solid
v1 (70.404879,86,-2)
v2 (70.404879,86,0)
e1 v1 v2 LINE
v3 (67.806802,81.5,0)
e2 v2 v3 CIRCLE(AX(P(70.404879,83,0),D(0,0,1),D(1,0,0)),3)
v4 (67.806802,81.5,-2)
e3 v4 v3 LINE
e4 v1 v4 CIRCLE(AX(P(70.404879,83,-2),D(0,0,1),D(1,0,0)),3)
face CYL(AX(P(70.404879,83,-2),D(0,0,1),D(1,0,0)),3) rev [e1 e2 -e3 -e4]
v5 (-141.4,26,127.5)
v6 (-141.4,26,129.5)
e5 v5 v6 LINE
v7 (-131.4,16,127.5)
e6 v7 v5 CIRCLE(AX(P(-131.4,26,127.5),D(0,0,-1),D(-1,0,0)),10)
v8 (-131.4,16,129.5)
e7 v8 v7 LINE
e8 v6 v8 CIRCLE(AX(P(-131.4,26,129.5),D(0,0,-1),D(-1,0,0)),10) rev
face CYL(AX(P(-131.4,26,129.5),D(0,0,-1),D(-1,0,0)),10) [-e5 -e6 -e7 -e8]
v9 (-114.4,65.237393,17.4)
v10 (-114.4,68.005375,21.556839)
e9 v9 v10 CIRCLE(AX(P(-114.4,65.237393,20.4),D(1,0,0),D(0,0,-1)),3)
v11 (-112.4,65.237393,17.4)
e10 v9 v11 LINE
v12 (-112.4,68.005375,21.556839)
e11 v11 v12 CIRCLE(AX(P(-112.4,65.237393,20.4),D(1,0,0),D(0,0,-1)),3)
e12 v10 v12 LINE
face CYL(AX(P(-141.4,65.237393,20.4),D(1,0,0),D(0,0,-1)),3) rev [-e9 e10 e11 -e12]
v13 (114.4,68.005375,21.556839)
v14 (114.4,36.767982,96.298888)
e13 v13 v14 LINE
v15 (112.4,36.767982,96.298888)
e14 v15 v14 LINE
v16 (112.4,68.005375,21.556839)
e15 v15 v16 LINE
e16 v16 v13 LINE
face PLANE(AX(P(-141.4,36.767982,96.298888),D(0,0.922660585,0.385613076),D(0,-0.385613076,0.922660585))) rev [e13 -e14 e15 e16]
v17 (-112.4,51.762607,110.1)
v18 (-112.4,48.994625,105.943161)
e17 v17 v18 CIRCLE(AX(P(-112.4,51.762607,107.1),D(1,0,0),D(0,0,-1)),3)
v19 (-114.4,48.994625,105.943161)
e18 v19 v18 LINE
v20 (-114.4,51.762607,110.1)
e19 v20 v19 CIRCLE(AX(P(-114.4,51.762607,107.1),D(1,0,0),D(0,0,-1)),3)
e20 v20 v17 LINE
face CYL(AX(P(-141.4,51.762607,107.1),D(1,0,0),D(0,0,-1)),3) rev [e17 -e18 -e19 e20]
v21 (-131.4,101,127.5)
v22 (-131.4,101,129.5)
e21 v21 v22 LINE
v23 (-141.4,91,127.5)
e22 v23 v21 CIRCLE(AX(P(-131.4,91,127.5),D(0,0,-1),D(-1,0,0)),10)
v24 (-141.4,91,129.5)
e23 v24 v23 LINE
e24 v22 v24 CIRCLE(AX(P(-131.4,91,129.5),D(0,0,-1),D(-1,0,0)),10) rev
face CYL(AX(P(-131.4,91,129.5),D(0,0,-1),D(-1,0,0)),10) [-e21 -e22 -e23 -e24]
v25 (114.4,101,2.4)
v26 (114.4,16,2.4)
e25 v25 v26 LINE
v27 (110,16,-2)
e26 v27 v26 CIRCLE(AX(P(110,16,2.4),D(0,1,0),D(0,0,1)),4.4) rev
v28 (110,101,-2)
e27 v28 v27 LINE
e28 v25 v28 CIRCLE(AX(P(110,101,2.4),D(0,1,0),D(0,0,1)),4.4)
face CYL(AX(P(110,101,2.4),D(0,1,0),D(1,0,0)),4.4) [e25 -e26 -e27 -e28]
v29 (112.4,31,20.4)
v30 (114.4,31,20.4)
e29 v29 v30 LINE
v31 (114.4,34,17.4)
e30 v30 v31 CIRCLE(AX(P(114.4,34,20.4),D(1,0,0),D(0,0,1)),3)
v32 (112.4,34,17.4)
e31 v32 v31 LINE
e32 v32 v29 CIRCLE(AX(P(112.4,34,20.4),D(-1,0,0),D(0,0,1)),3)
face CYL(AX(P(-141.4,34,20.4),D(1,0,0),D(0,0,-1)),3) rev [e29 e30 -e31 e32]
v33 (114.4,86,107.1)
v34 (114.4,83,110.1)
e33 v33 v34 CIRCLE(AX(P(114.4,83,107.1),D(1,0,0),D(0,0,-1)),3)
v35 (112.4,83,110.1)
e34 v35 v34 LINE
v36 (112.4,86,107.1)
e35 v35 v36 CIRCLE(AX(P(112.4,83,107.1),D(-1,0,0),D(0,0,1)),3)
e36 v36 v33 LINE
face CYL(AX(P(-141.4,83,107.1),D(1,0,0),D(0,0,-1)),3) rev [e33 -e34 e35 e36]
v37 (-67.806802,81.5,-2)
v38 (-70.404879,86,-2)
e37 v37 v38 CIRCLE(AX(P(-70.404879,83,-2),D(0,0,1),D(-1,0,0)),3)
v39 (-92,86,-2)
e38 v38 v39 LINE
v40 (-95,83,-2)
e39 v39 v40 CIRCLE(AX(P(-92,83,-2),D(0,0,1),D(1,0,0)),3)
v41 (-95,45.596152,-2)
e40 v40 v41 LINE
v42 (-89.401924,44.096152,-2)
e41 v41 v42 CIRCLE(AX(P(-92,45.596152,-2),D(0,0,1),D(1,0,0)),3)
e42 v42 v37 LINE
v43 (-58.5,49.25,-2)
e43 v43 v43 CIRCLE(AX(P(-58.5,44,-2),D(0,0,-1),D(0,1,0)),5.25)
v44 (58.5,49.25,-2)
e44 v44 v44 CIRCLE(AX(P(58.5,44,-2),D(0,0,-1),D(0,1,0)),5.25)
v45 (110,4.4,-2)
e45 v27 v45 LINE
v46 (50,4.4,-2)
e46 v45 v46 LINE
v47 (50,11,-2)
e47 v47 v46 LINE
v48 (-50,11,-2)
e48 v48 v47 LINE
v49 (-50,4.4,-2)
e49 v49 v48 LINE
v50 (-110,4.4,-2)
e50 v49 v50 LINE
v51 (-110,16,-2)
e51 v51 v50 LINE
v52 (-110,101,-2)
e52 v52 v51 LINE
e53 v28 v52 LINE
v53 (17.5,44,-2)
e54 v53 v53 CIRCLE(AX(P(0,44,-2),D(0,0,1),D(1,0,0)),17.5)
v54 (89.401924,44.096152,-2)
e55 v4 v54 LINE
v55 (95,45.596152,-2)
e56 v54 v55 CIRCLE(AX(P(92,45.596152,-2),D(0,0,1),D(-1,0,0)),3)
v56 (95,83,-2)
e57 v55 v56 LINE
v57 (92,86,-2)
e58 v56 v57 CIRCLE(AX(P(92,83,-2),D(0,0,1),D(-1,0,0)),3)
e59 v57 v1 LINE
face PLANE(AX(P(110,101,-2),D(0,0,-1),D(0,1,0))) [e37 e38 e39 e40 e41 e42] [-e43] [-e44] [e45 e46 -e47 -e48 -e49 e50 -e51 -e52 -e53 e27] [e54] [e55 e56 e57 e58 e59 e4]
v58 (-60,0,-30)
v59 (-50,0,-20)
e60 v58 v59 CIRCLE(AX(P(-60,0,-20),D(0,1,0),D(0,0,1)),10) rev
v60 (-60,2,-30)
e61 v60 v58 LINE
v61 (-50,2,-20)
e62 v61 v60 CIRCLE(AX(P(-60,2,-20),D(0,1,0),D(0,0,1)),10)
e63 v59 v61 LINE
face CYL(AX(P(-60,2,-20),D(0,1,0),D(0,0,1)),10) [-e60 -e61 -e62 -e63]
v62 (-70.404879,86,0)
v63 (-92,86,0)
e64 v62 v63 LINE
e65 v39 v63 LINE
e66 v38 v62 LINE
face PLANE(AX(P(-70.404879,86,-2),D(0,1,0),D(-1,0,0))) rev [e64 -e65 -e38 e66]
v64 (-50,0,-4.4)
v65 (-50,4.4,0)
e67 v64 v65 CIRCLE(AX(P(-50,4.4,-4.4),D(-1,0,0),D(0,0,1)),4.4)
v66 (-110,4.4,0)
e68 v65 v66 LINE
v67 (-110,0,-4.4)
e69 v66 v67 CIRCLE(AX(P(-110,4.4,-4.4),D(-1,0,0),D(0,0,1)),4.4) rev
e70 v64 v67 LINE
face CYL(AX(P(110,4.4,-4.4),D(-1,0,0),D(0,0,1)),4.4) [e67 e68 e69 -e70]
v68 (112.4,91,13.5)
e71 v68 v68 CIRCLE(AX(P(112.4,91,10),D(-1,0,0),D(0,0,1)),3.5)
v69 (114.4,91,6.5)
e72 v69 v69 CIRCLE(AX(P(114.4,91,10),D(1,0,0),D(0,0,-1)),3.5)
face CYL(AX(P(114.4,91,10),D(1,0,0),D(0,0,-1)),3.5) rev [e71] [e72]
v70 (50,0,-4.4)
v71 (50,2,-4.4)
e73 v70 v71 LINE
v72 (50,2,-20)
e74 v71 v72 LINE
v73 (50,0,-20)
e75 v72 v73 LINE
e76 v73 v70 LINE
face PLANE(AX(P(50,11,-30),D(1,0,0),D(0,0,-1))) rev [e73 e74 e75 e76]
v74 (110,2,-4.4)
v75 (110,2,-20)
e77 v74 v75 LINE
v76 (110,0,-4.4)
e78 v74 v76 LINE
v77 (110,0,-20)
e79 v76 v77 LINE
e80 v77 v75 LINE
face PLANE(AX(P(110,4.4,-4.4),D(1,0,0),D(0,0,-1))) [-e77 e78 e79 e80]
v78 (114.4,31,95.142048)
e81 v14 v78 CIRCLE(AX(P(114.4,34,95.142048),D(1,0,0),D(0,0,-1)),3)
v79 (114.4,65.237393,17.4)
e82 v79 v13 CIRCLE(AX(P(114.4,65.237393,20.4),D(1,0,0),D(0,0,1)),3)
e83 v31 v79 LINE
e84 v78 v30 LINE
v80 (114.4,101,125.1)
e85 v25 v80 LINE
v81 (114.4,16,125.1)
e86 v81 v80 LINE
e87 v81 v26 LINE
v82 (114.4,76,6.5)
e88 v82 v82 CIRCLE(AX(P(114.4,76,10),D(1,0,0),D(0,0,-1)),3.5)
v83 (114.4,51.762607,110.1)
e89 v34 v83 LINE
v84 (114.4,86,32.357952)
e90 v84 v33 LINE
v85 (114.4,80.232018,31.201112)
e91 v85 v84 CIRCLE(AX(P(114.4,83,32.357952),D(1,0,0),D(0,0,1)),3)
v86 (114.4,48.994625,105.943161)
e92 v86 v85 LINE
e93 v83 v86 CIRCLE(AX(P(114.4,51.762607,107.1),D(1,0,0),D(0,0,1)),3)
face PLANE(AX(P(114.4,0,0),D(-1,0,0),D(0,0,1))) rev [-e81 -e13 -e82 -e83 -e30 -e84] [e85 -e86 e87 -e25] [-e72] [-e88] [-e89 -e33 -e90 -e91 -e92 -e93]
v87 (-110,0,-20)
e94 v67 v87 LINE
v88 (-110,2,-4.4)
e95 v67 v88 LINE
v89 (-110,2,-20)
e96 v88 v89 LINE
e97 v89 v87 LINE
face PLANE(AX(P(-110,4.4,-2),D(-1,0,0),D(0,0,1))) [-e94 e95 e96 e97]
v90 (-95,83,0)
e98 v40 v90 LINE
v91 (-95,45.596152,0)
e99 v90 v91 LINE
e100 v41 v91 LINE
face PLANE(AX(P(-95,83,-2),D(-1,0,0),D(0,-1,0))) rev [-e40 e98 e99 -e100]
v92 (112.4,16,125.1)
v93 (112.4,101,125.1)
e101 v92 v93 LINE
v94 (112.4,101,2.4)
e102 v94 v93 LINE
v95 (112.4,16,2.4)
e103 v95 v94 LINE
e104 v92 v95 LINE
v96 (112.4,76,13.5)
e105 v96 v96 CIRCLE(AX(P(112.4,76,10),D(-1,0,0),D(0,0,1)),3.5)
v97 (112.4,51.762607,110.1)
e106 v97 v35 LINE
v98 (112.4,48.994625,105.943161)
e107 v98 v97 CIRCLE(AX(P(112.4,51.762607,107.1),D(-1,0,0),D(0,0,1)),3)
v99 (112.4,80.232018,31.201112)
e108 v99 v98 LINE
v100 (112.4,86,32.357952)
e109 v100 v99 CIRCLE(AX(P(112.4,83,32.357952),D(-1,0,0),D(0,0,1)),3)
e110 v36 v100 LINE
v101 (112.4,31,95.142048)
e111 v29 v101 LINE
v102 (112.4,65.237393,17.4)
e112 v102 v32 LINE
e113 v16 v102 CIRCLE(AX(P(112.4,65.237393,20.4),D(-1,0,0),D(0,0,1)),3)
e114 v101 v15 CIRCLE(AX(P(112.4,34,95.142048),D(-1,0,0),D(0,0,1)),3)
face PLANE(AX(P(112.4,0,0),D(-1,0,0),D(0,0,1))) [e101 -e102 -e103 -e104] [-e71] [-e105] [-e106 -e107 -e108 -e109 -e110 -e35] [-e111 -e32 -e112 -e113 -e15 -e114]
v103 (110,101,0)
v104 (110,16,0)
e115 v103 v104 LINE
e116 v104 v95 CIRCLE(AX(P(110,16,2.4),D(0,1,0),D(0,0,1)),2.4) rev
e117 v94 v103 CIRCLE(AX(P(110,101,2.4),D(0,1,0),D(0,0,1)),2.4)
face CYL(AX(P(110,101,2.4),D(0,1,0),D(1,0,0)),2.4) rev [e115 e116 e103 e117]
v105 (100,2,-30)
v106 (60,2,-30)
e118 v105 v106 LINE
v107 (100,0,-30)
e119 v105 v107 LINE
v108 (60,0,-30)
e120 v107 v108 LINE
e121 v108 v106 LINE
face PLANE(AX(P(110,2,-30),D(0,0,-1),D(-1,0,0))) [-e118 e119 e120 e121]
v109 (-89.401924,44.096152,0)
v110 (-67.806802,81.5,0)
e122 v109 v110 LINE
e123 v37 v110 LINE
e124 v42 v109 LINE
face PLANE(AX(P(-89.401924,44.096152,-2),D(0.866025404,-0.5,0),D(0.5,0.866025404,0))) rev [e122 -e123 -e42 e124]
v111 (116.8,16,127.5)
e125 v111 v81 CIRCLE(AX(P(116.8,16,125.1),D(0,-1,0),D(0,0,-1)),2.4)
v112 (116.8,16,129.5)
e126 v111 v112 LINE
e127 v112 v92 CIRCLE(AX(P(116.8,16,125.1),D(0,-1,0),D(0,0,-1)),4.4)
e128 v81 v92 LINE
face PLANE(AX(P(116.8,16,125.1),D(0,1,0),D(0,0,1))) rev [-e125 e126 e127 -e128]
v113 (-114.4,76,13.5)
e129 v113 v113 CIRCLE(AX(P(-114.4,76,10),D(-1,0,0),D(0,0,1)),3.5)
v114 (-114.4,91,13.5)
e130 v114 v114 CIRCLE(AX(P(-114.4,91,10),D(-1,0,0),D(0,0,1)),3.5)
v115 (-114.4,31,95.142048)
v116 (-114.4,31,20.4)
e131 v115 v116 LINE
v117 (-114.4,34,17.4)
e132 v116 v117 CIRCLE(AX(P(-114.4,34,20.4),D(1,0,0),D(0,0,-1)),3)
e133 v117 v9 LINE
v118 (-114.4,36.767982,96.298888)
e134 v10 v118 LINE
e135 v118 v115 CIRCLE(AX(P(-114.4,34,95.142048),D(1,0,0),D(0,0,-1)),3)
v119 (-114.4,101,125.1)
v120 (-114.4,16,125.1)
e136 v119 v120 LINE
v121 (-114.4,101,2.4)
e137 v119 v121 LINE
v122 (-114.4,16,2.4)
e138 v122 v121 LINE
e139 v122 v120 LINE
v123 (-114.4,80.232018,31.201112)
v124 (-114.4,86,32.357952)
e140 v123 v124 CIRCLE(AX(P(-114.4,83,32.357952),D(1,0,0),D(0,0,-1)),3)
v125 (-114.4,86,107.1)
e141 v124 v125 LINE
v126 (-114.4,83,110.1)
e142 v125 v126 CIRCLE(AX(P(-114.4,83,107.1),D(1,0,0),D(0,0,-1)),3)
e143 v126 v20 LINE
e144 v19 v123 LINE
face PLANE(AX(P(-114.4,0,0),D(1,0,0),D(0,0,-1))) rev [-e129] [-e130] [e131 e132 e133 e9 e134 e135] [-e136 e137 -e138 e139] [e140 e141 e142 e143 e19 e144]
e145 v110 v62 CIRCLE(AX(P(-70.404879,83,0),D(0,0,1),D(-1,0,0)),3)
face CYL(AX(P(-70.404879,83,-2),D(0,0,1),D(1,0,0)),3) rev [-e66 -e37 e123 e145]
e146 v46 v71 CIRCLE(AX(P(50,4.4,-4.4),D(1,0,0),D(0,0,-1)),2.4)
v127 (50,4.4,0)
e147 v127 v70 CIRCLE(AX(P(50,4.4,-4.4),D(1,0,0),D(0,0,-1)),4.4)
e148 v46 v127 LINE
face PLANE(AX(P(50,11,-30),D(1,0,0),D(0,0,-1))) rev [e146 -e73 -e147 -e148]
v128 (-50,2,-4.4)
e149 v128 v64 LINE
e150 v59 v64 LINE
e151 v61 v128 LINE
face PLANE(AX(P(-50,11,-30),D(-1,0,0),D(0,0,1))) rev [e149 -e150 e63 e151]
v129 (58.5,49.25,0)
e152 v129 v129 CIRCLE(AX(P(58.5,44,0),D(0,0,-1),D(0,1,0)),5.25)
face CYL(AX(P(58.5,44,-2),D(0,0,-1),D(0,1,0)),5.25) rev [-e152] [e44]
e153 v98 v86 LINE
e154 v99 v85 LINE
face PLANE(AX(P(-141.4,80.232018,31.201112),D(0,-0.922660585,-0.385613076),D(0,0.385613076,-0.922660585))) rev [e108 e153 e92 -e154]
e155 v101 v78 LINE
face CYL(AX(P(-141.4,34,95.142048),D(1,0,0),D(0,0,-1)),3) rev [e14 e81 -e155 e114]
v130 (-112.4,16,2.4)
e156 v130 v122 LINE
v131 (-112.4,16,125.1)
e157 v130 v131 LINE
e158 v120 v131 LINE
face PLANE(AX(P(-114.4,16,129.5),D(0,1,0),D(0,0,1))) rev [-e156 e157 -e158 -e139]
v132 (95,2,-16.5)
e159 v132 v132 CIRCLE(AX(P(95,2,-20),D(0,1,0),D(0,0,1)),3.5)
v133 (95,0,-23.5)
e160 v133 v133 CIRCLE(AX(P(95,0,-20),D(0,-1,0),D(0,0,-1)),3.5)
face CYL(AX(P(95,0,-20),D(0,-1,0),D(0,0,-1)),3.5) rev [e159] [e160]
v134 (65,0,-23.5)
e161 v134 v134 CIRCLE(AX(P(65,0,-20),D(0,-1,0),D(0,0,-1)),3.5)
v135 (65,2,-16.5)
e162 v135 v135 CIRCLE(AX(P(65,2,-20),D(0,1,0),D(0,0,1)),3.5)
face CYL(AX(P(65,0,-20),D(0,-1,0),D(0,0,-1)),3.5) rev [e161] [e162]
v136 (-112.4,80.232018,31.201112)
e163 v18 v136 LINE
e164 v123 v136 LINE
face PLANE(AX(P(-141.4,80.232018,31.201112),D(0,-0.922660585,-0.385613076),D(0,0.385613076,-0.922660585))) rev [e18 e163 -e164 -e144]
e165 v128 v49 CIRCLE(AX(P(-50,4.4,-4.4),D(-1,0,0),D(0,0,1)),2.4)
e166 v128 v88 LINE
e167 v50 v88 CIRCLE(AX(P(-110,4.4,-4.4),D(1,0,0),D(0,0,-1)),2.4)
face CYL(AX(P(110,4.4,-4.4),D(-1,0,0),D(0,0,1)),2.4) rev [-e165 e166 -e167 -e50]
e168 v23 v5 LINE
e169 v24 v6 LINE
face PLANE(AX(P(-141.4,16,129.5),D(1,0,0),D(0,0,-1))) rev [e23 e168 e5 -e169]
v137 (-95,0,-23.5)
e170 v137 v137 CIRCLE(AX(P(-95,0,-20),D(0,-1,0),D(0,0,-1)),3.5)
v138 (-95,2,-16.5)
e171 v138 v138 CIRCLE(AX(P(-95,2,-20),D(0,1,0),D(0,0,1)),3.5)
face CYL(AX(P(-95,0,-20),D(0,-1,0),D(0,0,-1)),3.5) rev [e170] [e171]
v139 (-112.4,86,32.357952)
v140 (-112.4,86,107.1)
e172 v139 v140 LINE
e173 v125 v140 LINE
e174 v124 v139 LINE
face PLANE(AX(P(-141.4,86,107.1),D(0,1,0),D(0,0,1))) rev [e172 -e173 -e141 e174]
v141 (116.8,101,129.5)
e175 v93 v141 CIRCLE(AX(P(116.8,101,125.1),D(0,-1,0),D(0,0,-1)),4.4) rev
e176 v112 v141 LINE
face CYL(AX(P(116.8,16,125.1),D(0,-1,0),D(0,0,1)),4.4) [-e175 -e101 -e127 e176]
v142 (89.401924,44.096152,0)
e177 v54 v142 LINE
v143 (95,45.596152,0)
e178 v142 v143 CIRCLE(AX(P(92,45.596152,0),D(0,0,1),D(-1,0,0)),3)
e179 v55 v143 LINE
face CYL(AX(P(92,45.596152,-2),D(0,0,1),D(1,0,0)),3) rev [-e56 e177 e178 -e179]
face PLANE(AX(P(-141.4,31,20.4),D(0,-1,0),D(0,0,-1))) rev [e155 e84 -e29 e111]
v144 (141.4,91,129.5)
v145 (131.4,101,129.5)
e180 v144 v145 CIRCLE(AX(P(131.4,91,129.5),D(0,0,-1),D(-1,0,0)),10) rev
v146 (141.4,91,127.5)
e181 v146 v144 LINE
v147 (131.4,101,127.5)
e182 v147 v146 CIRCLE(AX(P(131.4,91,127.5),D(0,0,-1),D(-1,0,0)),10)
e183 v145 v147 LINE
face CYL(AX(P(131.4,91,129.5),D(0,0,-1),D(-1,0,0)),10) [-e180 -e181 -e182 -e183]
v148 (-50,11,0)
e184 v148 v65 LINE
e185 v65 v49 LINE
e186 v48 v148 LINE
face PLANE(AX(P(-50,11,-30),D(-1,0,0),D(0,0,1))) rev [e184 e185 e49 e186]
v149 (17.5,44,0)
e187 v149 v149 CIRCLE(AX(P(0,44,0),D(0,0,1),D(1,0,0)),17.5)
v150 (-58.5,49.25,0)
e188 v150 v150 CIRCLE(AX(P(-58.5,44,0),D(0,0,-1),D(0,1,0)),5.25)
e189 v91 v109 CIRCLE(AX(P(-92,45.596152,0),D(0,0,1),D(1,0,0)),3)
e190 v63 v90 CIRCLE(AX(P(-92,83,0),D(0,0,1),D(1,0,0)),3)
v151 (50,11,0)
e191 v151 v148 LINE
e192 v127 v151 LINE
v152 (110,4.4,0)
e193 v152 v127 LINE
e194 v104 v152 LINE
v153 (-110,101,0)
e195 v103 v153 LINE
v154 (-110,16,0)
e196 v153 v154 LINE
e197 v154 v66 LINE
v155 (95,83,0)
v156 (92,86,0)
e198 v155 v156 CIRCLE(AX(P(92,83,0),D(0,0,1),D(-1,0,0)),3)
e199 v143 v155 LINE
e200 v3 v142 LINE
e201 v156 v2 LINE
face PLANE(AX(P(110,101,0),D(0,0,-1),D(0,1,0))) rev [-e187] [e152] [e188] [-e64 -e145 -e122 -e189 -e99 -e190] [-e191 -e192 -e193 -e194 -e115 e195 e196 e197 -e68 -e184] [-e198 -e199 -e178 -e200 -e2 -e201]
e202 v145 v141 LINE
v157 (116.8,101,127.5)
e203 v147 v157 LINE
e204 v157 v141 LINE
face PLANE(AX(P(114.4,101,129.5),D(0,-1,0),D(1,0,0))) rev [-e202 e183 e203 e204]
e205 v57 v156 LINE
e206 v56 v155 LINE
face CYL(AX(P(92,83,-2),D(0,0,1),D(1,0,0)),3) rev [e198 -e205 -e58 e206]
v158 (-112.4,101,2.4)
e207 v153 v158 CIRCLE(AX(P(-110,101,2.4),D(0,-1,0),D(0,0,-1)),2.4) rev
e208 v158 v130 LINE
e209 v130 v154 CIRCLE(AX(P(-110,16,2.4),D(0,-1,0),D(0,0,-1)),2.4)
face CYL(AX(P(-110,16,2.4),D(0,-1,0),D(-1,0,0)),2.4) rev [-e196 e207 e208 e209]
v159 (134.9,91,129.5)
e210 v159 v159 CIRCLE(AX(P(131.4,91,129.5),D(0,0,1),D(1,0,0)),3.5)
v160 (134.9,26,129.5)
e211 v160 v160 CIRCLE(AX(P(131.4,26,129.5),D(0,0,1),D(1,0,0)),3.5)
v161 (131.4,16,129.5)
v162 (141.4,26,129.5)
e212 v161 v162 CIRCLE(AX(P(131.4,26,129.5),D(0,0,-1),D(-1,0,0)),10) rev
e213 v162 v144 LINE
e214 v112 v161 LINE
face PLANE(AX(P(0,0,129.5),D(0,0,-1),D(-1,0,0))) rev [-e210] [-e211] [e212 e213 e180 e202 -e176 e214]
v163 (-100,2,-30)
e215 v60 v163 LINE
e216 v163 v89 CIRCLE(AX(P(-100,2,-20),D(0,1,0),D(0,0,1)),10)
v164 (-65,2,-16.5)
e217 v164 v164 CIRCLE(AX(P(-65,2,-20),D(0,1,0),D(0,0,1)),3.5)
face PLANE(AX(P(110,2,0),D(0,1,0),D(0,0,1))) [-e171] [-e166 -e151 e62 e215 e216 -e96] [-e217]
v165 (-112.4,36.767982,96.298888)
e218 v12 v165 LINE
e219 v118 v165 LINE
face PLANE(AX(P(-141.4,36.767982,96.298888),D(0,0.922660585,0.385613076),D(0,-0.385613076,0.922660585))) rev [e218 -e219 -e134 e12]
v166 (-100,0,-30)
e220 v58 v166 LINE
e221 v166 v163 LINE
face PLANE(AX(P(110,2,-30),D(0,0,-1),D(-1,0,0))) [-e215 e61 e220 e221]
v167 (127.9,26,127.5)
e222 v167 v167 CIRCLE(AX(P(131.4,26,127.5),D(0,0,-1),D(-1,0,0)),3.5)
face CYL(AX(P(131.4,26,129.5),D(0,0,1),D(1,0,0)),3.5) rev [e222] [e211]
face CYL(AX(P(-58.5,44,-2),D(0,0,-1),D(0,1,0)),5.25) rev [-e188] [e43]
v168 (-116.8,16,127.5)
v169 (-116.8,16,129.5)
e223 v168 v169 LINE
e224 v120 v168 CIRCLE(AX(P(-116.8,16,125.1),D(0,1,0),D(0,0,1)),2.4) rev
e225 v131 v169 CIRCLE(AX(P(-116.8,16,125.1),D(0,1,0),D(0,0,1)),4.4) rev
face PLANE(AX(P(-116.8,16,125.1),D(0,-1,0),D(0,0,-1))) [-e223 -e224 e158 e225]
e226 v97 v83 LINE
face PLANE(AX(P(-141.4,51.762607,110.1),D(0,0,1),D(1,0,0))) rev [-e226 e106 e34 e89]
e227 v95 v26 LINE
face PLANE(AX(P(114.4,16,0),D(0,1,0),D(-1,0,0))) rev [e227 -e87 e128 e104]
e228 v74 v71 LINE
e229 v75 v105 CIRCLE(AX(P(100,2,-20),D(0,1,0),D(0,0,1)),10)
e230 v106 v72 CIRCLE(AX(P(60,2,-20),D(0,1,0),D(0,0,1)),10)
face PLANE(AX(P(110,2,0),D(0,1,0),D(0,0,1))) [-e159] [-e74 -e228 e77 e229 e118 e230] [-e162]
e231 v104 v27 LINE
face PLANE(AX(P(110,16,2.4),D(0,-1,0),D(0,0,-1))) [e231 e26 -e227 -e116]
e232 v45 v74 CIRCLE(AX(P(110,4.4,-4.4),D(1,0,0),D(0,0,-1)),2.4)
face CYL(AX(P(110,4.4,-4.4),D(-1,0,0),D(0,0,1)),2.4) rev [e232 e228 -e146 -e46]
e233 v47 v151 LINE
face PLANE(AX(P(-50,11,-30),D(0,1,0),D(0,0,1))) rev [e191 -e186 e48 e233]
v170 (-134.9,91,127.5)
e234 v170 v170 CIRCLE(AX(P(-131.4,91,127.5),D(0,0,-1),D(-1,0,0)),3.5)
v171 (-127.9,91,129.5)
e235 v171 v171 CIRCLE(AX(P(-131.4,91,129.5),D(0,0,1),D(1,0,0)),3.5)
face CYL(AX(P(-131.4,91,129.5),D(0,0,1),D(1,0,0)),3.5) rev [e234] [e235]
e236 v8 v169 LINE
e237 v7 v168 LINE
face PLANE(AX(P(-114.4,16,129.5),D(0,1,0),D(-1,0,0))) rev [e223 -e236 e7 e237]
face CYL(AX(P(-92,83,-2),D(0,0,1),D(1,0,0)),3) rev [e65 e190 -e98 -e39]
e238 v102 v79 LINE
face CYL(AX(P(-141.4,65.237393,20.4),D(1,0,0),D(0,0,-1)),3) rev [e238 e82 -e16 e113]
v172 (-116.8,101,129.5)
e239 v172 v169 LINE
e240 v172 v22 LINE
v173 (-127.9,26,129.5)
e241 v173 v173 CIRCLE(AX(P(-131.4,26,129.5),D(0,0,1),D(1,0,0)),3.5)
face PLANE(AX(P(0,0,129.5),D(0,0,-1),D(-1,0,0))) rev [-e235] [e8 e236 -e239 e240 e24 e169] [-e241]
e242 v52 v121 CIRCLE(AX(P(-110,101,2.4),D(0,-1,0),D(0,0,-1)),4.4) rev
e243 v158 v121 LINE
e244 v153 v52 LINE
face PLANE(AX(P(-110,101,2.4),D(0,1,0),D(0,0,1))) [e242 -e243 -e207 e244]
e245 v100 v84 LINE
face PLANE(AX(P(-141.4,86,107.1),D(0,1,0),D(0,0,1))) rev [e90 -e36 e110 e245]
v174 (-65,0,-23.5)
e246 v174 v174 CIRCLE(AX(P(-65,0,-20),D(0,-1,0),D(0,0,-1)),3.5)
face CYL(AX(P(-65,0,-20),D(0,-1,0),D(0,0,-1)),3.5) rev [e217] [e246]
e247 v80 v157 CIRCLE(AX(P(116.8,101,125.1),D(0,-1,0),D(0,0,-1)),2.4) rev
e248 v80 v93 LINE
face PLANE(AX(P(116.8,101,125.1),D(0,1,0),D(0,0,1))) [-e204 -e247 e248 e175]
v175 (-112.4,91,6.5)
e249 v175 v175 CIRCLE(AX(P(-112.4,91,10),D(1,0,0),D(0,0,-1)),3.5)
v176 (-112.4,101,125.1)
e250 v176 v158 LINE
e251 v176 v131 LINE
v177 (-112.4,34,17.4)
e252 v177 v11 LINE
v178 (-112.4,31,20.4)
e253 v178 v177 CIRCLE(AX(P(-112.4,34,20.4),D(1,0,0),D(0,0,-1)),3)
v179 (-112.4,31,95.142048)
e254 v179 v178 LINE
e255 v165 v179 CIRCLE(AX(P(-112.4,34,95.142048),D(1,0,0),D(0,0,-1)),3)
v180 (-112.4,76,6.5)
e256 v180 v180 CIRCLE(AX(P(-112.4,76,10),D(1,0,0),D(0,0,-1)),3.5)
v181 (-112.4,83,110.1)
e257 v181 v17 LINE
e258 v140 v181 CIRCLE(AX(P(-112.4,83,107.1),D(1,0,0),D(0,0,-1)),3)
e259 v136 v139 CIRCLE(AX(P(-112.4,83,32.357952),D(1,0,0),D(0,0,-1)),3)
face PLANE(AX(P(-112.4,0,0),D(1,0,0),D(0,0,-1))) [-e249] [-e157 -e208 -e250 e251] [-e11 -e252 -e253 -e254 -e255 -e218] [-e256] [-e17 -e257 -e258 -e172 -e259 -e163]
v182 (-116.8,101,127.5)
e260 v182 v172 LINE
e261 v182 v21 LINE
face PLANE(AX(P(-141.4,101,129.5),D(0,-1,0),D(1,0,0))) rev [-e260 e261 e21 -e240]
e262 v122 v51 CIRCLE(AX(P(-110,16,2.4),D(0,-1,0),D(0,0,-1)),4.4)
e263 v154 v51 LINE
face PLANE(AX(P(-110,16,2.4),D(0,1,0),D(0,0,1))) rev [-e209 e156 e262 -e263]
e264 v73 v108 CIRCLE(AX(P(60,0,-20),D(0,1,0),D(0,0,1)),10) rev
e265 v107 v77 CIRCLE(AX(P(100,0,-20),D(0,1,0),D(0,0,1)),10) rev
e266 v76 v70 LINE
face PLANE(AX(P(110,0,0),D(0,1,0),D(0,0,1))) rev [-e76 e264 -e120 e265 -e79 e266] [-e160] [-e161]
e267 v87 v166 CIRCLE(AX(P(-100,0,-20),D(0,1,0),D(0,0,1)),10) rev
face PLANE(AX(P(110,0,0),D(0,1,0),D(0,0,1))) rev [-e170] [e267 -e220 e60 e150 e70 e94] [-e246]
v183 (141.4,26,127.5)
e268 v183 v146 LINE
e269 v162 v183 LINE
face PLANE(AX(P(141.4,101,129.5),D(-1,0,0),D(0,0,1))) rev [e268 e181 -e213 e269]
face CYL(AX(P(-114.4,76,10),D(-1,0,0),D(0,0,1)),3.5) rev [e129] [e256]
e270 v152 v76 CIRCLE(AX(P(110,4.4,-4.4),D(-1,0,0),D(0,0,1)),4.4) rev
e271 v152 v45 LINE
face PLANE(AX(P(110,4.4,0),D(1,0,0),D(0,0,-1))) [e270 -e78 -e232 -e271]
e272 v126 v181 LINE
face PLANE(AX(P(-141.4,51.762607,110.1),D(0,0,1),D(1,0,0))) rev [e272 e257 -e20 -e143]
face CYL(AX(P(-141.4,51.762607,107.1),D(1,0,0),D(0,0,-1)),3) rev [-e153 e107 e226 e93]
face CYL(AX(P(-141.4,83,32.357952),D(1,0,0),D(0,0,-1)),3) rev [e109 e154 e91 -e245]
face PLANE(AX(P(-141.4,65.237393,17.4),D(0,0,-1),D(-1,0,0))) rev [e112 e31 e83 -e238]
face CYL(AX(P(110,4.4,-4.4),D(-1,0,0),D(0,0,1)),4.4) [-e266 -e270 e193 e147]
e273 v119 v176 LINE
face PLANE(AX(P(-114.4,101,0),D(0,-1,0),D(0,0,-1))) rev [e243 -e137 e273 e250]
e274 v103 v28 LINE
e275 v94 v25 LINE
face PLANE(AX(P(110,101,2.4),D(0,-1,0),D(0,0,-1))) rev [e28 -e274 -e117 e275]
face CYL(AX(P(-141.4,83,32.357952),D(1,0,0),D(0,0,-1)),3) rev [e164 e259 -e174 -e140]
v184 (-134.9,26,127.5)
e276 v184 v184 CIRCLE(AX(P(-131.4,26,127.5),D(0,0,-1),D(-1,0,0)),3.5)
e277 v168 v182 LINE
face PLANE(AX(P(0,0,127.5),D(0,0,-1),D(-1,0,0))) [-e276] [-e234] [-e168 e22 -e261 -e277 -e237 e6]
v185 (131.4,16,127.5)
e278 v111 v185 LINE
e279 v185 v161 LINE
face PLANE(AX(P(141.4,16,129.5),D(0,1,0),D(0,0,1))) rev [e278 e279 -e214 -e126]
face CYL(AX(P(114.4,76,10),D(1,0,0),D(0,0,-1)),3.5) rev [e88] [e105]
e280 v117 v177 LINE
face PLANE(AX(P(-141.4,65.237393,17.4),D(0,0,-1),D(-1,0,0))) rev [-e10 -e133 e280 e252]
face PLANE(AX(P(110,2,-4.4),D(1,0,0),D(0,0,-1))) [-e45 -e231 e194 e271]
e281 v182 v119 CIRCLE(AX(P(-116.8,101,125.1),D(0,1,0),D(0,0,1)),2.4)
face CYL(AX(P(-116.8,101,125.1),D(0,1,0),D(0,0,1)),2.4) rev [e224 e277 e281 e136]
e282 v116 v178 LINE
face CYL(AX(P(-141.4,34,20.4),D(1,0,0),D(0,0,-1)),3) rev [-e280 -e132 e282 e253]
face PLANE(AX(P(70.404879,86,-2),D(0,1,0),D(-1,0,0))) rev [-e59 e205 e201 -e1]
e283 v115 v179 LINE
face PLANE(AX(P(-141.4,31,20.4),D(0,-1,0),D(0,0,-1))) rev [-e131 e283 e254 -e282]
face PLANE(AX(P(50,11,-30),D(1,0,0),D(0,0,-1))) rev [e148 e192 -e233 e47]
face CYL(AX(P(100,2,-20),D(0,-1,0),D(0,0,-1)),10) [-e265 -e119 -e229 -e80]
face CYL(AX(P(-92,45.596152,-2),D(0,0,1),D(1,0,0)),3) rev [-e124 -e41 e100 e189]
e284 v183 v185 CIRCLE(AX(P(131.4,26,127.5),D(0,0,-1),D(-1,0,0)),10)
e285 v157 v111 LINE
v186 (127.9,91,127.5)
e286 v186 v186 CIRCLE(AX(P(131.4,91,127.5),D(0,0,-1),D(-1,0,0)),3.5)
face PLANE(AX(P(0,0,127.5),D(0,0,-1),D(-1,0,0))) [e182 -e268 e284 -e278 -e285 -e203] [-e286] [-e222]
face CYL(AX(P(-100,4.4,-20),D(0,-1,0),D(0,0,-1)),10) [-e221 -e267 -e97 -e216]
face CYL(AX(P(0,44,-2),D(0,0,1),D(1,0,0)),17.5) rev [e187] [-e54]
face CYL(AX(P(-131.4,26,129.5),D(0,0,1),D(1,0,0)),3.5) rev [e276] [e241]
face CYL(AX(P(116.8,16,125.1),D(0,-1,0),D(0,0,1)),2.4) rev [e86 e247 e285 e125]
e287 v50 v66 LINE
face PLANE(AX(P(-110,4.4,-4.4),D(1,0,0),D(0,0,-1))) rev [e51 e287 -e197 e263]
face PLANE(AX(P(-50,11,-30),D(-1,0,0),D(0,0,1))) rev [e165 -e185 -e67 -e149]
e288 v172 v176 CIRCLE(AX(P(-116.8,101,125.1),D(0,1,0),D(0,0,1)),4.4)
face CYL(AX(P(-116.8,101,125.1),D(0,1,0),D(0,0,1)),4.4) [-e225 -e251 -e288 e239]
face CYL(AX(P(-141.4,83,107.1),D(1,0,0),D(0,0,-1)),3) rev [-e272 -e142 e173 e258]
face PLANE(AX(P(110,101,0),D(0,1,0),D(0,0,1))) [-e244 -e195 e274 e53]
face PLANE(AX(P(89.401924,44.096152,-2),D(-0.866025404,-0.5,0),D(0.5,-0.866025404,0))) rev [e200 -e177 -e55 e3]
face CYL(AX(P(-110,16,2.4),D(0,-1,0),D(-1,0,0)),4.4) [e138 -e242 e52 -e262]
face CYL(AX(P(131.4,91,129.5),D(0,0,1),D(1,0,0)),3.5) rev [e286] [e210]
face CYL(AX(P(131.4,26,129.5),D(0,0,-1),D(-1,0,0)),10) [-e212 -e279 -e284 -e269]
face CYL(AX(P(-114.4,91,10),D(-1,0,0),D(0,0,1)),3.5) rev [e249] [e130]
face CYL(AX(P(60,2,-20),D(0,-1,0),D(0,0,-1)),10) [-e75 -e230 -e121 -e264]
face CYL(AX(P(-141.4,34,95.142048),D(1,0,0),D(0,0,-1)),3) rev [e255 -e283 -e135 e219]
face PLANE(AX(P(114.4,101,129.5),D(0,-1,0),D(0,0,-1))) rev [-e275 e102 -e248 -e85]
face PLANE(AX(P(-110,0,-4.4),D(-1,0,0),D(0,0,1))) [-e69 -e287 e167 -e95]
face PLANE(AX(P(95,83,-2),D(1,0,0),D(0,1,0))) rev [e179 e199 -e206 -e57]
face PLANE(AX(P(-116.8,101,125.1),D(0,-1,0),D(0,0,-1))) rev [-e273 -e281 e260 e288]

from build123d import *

# Parameters (mm, degrees)
SM_START                           = -110
SM_BASE_FLANGE_1_DEPTH             = 220
SKETCH_6_R                         = 17.5
CUT_EXTRUDE_1_DEPTH                = 10
HOLE_WIZARD_7_0_7_1_D              = 7
SKETCH_21_W                        = 100
SKETCH_21_H                        = 11
CUT_EXTRUDE_4_DEPTH                = 153.318744743
FILLET_1_R                         = 10
SM_EDGE_FLANGE_1_DEPTH             = 85
SM_EDGE_FLANGE_1_BEND_DEPTH        = 85
SM_EDGE_FLANGE_2_STRIP_W           = 12.8
SM_EDGE_FLANGE_2_STRIP_H           = 2
SM_EDGE_FLANGE_2_STRIP_CUT_DEPTH   = 85
SM_EDGE_FLANGE_2_STRIP_2_W         = 12.8
SM_EDGE_FLANGE_2_STRIP_2_H         = 2
SM_EDGE_FLANGE_2_STRIP_CUT_2_DEPTH = 85
SM_EDGE_FLANGE_2_DEPTH             = 85
SM_EDGE_FLANGE_2_BEND_DEPTH        = 85
FILLET_2_R                         = 10
CUT_EXTRUDE_5_DEPTH                = 304.981726424
CUT_EXTRUDE_6_DEPTH                = 10
HOLE_WIZARD_7_0_7_2_D              = 7
HOLE_WIZARD_7_0_7_2_DEPTH          = 14
HOLE_WIZARD_7_0_7_2_TIP            = 2.103012167
F_7_0_7_DIAMETER_HOLE1_AT_2_COUNT  = 2
F_7_0_7_DIAMETER_HOLE1_AT_2_PITCH  = 15
F_10_5_10_5_DIAMETER_HOLE1_D       = 10.5


# Read off the part's stored shape, not the designer's step: Базовая кромка1
# Sheet-metal steps are written as plain solids
with BuildPart() as part:
    # Базовая кромка1 outline → Базовая кромка1 (new body)
    with BuildSketch(Plane(origin=(0, 0, 0), x_dir=(0, 0, -1), z_dir=(1, 0, 0)).offset(SM_START)):
        with BuildLine():
            Line((4.4, 0), (30, 0))
            Line((30, 0), (30, 2))
            Line((30, 2), (4.4, 2))
            ThreePointArc((4.4, 2), (2.702943725, 2.702943725), (2, 4.4))
            Line((2, 4.4), (2, 101))
            Line((2, 101), (0, 101))
            Line((0, 101), (0, 4.4))
            ThreePointArc((0, 4.4), (1.288730163, 1.288730163), (4.4, 0))
        make_face()
    extrude(amount=SM_BASE_FLANGE_1_DEPTH)

    # Эскиз6 → Вырез-Вытянуть1 (cut)
    with BuildSketch(Plane.XY):
        with Locations((0, 44)):
            Circle(SKETCH_6_R)
    extrude(amount=-CUT_EXTRUDE_1_DEPTH, mode=Mode.SUBTRACT)

    # Диаметр отверстия Ø7.0 (7)1 (through all)
    with Locations(Plane(origin=(0, 0, 0), x_dir=(-1, 0, 0), z_dir=(0, -1, 0))):
        with Locations((95, 20), (65, 20), (-65, 20), (-95, 20)):
            Hole(HOLE_WIZARD_7_0_7_1_D / 2)

    # Эскиз21 → Вырез-Вытянуть4 (cut, through all)
    with BuildSketch(Plane.XY):
        with Locations((0, 5.5)):
            Rectangle(SKETCH_21_W, SKETCH_21_H)
    extrude(amount=-CUT_EXTRUDE_4_DEPTH, mode=Mode.SUBTRACT)

    # Скругление1
    fillet_1_edges = [part.edges().sort_by_distance(p)[0] for p in [
        (110, 1, -30),
        (-50, 1, -30),
        (50, 1, -30),
        (-110, 1, -30),
    ]]
    fillet(fillet_1_edges, radius=FILLET_1_R)

    # Ребро-кромка1 section (across the edge) → Ребро-кромка1 (add)
    with BuildSketch(Plane(origin=(112.4, 16, 0), x_dir=(-1, 0, 0), z_dir=(0, 1, 0))):
        with BuildLine():
            Line((-2, 2.4), (-2, 129.5))
            Line((-2, 129.5), (0, 129.5))
            Line((0, 129.5), (0, 2.4))
            ThreePointArc((0, 2.4), (0.702943725, 0.702943725), (2.4, 0))
            Line((2.4, 0), (2.4, -2))
            ThreePointArc((2.4, -2), (-0.711269837, -0.711269837), (-2, 2.4))
        make_face()
    extrude(amount=SM_EDGE_FLANGE_1_DEPTH)

    # Ребро-кромка1 section 2 (across the edge) → Ребро-кромка1 bend (add)
    with BuildSketch(Plane(origin=(-112.4, 101, 0), x_dir=(1, 0, 0), z_dir=(0, -1, 0))):
        with BuildLine():
            Line((-2, 2.4), (-2, 129.5))
            Line((-2, 129.5), (0, 129.5))
            Line((0, 129.5), (0, 2.4))
            ThreePointArc((0, 2.4), (0.702943725, 0.702943725), (2.4, 0))
            Line((2.4, 0), (2.4, -2))
            ThreePointArc((2.4, -2), (-0.711269837, -0.711269837), (-2, 2.4))
        make_face()
    extrude(amount=SM_EDGE_FLANGE_1_BEND_DEPTH)

    # Ребро-кромка2 strip (across the edge) → Ребро-кромка2 strip cut (cut)
    with BuildSketch(Plane(origin=(114.4, 101, 129.5), x_dir=(0, 0, -1), z_dir=(0, -1, 0))):
        with Locations((-2, -1)):
            Rectangle(SM_EDGE_FLANGE_2_STRIP_W, SM_EDGE_FLANGE_2_STRIP_H)
    extrude(amount=SM_EDGE_FLANGE_2_STRIP_CUT_DEPTH, mode=Mode.SUBTRACT)

    # Ребро-кромка2 strip 2 (across the edge) → Ребро-кромка2 strip cut 2 (cut)
    with BuildSketch(Plane(origin=(-114.4, 16, 129.5), x_dir=(0, 0, -1), z_dir=(0, 1, 0))):
        with Locations((-2, -1)):
            Rectangle(SM_EDGE_FLANGE_2_STRIP_2_W, SM_EDGE_FLANGE_2_STRIP_2_H)
    extrude(amount=SM_EDGE_FLANGE_2_STRIP_CUT_2_DEPTH, mode=Mode.SUBTRACT)

    # Ребро-кромка2 section (across the edge) → Ребро-кромка2 (add)
    with BuildSketch(Plane(origin=(114.4, 101, 129.5), x_dir=(0, 0, -1), z_dir=(0, -1, 0))):
        with BuildLine():
            Line((0, 2.4), (0, 27))
            Line((0, 27), (2, 27))
            Line((2, 27), (2, 2.4))
            ThreePointArc((2, 2.4), (2.702943725, 0.702943725), (4.4, 0))
            Line((4.4, 0), (4.4, -2))
            ThreePointArc((4.4, -2), (1.288730163, -0.711269837), (0, 2.4))
        make_face()
    extrude(amount=SM_EDGE_FLANGE_2_DEPTH)

    # Ребро-кромка2 section 2 (across the edge) → Ребро-кромка2 bend (add)
    with BuildSketch(Plane(origin=(-114.4, 16, 129.5), x_dir=(0, 0, -1), z_dir=(0, 1, 0))):
        with BuildLine():
            Line((0, 2.4), (0, 27))
            Line((0, 27), (2, 27))
            Line((2, 27), (2, 2.4))
            ThreePointArc((2, 2.4), (2.702943725, 0.702943725), (4.4, 0))
            Line((4.4, 0), (4.4, -2))
            ThreePointArc((4.4, -2), (1.288730163, -0.711269837), (0, 2.4))
        make_face()
    extrude(amount=SM_EDGE_FLANGE_2_BEND_DEPTH)

    # Скругление2
    fillet_2_edges = [part.edges().sort_by_distance(p)[0] for p in [
        (141.4, 101, 128.5),
        (141.4, 16, 128.5),
        (-141.4, 16, 128.5),
        (-141.4, 101, 128.5),
    ]]
    fillet(fillet_2_edges, radius=FILLET_2_R)

    # Эскиз34 → Вырез-Вытянуть5 (cut, through all)
    with BuildSketch(Plane(origin=(114.4, 0, 0), x_dir=(0, 0, -1), z_dir=(1, 0, 0))):
        with BuildLine():
            Line((-107.1, 86), (-32.357951658, 86))
            ThreePointArc((-32.357951658, 86), (-29.416528086, 83.589938443), (-31.201112429, 80.232018245))
            Line((-31.201112429, 80.232018245), (-105.943160771, 48.99462536))
            ThreePointArc((-105.943160771, 48.99462536), (-108.762751081, 49.265557087), (-110.1, 51.762607115))
            Line((-110.1, 51.762607115), (-110.1, 83))
            ThreePointArc((-110.1, 83), (-109.221320344, 85.121320344), (-107.1, 86))
        make_face()
        with BuildLine():
            Line((-96.298887571, 36.767981755), (-21.556839229, 68.00537464))
            ThreePointArc((-21.556839229, 68.00537464), (-18.737248919, 67.734442913), (-17.4, 65.237392885))
            Line((-17.4, 65.237392885), (-17.4, 34))
            ThreePointArc((-17.4, 34), (-18.278679656, 31.878679656), (-20.4, 31))
            Line((-20.4, 31), (-95.142048342, 31))
            ThreePointArc((-95.142048342, 31), (-98.083471914, 33.410061557), (-96.298887571, 36.767981755))
        make_face()
    extrude(amount=-CUT_EXTRUDE_5_DEPTH, mode=Mode.SUBTRACT)

    # Эскиз35 → Вырез-Вытянуть6 (cut)
    with BuildSketch(Plane.XY):
        with BuildLine():
            Line((-70.404878533, 86), (-92, 86))
            ThreePointArc((-92, 86), (-94.121320344, 85.121320344), (-95, 83))
            Line((-95, 83), (-95, 45.596152423))
            ThreePointArc((-95, 45.596152423), (-92.776457135, 42.698374944), (-89.401923789, 44.096152423))
            Line((-89.401923789, 44.096152423), (-67.806802321, 81.5))
            ThreePointArc((-67.806802321, 81.5), (-67.806802321, 84.5), (-70.404878533, 86))
        make_face()
        with BuildLine():
            Line((95, 83), (95, 45.596152423))
            ThreePointArc((95, 45.596152423), (92.776457135, 42.698374944), (89.401923789, 44.096152423))
            Line((89.401923789, 44.096152423), (67.806802321, 81.5))
            ThreePointArc((67.806802321, 81.5), (67.806802321, 84.5), (70.404878533, 86))
            Line((70.404878533, 86), (92, 86))
            ThreePointArc((92, 86), (94.121320344, 85.121320344), (95, 83))
        make_face()
    extrude(amount=-CUT_EXTRUDE_6_DEPTH, mode=Mode.SUBTRACT)

    # Диаметр отверстия Ø7.0 (7)2
    with Locations(Plane.XY.offset(129.5)):
        with Locations((-131.4, 91), (-131.4, 26), (131.4, 91), (131.4, 26)):
            Hole(HOLE_WIZARD_7_0_7_2_D / 2, depth=HOLE_WIZARD_7_0_7_2_DEPTH)
            with Locations((0, 0, -(HOLE_WIZARD_7_0_7_2_DEPTH + HOLE_WIZARD_7_0_7_2_TIP / 2))):  # 118° drill point
                Cone(0, HOLE_WIZARD_7_0_7_2_D / 2, HOLE_WIZARD_7_0_7_2_TIP, mode=Mode.SUBTRACT)

    # Эскиз40 → Ø7.0 (7) Diameter Hole1 (revolve, cut)
    with BuildSketch(Plane(origin=(114.4, 91, 10), x_dir=(0, 0, -1), z_dir=(0, 1, 0))):
        Polygon((0, 0), (0, 7.103012167), (3.5, 5), (3.5, 0), align=None)
    f_7_0_7_diameter_hole1 = revolve(axis=Axis((120.75, 91, 10), (-1, 0, 0)), mode=Mode.SUBTRACT)

    # Ø7.0 (7) Diameter Hole1 at 2: Ø7.0 (7) Diameter Hole1 ×2
    with Locations(*[(0, -i * F_7_0_7_DIAMETER_HOLE1_AT_2_PITCH, 0) for i in range(1, F_7_0_7_DIAMETER_HOLE1_AT_2_COUNT)]):
        add(f_7_0_7_diameter_hole1, mode=Mode.SUBTRACT)

    # Зеркальное отражение1: Ø7.0 (7) Diameter Hole1 across plane
    add(f_7_0_7_diameter_hole1.mirror(Plane(origin=(0, 0, 0), x_dir=(0, 0, 1), z_dir=(1, 0, 0))), mode=Mode.SUBTRACT)

    # Зеркальное отражение1 copy 1 sketch → Зеркальное отражение1 copy 1 (revolve, cut)
    with BuildSketch(Plane(origin=(-114.4, 76, 10), x_dir=(0, 0, -1), z_dir=(0, 1, 0))):
        Polygon((0, 0), (0, -7.103012167), (3.5, -5), (3.5, 0), align=None)
    revolve(axis=Axis((-120.75, 76, 10), (-1, 0, 0)), mode=Mode.SUBTRACT)

    # Ø10.5 (10.5) Diameter Hole1 (through all)
    with Locations(Plane(origin=(0, 0, -2), x_dir=(-1, 0, 0), z_dir=(0, 0, -1))):
        with Locations((-58.5, 44), (58.5, 44)):
            Hole(F_10_5_10_5_DIAMETER_HOLE1_D / 2)


solid = part.part
